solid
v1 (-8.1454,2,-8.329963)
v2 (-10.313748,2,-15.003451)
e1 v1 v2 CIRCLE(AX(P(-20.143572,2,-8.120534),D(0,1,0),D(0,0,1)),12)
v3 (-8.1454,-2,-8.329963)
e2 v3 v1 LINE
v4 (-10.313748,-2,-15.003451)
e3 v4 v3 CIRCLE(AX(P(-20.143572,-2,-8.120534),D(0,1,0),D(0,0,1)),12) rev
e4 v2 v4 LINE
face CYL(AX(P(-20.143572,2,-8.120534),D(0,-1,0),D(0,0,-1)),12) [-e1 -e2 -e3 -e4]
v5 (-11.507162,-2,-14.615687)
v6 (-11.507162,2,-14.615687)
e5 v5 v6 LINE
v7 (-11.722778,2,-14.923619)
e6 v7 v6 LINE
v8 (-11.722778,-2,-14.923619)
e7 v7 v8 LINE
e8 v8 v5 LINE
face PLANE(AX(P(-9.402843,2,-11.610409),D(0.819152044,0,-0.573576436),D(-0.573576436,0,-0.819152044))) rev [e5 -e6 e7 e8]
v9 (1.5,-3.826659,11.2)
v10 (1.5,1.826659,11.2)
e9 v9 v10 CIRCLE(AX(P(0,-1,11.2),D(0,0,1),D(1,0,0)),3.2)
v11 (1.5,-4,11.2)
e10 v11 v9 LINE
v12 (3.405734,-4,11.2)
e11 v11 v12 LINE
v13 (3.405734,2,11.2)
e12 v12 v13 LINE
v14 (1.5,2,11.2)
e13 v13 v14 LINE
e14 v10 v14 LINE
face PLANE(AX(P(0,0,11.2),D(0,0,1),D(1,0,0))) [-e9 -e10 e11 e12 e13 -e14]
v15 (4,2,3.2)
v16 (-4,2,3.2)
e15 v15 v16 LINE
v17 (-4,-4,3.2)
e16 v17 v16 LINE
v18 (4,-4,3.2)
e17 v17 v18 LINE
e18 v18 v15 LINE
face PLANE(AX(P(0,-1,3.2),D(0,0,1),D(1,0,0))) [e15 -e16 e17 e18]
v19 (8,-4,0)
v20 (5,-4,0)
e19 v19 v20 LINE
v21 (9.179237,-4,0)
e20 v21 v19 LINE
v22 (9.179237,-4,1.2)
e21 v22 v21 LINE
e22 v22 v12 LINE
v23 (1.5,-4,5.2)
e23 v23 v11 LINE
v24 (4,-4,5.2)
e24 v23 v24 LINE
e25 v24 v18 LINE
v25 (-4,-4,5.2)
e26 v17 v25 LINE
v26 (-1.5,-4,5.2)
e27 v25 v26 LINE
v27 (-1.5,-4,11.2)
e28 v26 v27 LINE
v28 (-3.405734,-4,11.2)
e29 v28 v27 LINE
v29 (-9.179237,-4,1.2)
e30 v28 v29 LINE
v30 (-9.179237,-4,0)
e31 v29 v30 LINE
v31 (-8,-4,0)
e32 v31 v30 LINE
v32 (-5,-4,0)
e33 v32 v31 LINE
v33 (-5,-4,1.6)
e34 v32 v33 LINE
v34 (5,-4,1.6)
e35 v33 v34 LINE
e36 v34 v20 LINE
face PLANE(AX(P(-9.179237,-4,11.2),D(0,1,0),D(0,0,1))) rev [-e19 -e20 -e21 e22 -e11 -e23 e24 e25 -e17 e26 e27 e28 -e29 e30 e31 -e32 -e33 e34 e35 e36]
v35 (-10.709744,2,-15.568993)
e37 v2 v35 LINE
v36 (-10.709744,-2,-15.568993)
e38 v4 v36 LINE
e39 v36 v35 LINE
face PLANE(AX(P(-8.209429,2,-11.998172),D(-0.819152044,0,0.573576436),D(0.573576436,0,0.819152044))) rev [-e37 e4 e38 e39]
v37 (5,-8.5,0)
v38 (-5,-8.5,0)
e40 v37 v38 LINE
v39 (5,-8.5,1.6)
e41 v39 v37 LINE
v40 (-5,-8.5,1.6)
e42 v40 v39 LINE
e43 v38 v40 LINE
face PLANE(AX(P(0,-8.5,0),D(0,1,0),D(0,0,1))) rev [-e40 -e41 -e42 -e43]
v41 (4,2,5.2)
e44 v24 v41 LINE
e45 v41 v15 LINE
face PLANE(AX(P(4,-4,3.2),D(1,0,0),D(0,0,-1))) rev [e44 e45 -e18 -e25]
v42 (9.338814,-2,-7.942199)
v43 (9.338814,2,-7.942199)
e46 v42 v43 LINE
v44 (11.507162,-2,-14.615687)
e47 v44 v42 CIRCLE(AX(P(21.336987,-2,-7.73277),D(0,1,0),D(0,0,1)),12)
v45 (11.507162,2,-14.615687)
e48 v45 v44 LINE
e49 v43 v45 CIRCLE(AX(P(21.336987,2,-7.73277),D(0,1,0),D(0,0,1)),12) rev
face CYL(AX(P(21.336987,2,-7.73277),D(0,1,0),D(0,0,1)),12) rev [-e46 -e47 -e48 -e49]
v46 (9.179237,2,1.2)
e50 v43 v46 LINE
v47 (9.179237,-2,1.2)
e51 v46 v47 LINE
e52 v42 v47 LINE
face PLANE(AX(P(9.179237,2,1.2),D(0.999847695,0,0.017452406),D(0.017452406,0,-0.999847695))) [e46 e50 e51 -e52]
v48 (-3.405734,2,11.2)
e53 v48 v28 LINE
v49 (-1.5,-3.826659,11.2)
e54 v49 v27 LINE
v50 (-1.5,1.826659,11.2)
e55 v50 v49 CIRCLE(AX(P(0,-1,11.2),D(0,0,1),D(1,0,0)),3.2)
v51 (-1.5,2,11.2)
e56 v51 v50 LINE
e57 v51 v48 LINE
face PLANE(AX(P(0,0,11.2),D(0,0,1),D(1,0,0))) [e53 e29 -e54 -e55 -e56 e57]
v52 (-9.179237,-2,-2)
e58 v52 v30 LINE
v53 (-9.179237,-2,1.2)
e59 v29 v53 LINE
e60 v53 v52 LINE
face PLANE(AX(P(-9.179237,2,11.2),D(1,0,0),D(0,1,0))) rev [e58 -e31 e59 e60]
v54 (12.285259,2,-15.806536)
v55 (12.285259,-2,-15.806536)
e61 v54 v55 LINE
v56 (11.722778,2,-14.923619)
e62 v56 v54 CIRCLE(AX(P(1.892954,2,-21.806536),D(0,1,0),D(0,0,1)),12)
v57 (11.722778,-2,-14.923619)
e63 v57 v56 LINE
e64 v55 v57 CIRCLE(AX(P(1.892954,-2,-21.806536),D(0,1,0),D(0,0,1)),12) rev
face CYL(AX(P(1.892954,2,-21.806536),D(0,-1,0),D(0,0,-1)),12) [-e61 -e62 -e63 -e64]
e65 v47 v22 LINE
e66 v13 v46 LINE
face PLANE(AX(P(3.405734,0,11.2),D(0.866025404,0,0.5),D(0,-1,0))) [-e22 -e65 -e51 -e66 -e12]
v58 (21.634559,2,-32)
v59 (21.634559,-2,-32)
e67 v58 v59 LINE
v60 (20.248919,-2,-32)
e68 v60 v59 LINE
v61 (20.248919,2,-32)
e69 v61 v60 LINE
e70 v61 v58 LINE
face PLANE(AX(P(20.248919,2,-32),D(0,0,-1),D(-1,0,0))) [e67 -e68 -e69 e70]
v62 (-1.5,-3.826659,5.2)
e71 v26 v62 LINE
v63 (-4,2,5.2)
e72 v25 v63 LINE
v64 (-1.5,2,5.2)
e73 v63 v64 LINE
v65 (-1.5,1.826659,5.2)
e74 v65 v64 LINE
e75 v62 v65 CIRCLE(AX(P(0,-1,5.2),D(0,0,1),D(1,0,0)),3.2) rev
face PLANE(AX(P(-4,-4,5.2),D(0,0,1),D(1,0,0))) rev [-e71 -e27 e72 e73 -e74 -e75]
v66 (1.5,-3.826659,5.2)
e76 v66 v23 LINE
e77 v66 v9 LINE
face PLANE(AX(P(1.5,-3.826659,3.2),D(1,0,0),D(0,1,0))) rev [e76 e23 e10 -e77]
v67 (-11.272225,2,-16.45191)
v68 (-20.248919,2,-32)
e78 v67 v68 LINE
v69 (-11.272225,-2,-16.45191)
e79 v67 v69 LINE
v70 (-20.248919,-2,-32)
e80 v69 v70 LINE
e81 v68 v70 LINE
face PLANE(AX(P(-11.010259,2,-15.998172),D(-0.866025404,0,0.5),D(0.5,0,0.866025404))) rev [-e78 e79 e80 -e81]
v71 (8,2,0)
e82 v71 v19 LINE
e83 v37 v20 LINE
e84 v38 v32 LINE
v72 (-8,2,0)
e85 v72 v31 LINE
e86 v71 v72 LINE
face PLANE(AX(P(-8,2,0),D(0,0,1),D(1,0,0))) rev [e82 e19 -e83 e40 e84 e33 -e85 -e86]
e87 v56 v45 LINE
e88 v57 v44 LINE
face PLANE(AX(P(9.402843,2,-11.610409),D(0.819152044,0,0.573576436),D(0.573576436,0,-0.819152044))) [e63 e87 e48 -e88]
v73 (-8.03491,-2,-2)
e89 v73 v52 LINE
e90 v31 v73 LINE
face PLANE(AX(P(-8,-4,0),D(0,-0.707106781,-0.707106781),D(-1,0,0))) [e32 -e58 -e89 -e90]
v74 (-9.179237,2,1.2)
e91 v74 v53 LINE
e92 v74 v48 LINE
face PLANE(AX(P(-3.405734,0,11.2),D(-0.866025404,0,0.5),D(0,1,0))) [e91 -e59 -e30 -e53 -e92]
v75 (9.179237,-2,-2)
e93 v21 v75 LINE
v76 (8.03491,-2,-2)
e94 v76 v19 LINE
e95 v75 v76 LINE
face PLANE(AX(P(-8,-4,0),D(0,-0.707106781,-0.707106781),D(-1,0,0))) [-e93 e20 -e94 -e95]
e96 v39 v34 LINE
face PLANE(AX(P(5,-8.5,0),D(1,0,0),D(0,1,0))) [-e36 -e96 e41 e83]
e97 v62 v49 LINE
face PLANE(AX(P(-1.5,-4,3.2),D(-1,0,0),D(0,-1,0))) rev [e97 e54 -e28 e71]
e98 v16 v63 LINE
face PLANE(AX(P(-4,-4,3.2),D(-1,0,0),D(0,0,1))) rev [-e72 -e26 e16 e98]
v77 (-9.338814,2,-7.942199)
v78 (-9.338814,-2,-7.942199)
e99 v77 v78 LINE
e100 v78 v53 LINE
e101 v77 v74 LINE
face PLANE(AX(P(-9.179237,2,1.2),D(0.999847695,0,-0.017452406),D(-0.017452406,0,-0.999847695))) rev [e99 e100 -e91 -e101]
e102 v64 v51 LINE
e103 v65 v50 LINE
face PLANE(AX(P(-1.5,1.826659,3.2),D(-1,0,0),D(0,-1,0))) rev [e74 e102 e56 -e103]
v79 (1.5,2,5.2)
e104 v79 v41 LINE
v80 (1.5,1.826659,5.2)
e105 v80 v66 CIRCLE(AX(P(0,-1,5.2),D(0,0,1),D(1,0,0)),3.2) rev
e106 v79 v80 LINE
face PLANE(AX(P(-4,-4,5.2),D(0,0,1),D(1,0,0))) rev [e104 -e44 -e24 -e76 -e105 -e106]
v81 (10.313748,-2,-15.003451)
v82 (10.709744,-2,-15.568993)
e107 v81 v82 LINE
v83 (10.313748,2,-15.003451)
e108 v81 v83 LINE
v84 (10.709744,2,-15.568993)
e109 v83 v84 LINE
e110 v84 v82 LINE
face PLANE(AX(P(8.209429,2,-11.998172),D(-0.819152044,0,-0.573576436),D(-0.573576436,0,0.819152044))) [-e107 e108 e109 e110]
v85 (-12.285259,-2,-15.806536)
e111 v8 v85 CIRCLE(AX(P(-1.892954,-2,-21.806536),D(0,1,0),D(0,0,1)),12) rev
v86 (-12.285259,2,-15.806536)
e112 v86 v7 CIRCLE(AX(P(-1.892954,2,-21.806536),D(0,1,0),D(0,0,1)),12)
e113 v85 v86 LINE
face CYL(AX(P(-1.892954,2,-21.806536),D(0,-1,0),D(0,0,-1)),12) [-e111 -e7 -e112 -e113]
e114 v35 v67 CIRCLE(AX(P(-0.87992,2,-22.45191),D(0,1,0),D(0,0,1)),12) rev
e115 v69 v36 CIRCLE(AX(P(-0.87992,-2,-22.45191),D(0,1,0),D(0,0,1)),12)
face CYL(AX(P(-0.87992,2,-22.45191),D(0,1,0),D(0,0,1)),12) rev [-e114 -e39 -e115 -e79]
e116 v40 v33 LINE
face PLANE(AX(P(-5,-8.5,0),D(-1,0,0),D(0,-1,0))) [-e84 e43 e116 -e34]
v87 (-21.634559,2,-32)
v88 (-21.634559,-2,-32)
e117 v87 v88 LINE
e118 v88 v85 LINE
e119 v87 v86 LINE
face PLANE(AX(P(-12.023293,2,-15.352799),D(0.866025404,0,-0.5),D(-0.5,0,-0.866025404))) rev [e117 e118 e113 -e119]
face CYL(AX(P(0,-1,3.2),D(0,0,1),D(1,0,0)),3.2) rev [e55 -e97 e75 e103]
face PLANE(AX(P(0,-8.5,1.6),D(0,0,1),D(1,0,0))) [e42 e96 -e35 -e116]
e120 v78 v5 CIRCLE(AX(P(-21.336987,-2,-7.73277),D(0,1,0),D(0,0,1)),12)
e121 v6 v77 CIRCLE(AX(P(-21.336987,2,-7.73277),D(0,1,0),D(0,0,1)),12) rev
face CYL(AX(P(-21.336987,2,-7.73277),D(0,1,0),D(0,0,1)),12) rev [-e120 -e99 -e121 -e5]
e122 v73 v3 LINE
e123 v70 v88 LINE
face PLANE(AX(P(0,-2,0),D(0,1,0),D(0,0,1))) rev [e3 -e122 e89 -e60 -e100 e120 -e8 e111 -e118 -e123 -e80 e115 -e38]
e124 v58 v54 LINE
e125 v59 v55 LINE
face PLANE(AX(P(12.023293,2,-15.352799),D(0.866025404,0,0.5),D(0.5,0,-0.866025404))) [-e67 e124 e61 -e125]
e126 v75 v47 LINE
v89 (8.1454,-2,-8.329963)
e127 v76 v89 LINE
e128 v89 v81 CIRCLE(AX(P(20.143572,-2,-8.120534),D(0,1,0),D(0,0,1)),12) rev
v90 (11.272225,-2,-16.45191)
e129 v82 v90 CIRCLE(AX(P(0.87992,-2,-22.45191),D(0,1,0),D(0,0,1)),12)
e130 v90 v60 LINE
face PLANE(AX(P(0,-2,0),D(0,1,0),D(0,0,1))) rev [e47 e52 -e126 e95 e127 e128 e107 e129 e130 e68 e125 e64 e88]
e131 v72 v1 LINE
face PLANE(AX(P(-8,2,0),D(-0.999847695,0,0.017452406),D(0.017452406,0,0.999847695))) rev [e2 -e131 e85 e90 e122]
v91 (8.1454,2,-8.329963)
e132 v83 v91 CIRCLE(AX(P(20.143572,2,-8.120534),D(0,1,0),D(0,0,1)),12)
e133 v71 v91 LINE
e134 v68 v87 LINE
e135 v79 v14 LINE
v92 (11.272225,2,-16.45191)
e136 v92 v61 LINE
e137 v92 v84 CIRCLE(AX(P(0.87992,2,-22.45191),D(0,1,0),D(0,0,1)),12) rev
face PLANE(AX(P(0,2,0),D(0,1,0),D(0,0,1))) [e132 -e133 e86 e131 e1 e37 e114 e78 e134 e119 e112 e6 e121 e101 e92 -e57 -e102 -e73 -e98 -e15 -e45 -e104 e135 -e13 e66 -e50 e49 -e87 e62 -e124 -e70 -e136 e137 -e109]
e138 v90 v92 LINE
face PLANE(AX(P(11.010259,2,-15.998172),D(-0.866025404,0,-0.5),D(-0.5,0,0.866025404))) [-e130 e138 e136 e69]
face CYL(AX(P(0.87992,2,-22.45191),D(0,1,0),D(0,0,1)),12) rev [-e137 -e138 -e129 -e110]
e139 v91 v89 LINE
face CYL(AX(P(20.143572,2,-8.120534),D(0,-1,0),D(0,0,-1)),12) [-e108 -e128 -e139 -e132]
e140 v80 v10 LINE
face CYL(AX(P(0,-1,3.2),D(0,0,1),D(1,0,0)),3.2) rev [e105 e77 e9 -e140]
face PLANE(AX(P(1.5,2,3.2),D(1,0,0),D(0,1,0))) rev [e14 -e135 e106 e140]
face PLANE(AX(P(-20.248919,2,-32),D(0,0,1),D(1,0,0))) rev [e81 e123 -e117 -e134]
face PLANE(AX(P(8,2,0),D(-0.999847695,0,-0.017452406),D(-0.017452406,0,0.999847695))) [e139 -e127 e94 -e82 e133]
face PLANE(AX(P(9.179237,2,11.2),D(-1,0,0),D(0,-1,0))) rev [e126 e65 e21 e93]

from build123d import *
from OCP.BRepFilletAPI import BRepFilletAPI_MakeChamfer

# Parameters (mm, degrees)
BOSS_EXTRUDE1_DEPTH             = 2
BOSS_EXTRUDE2_REACH             = 41.677
SKETCH2_W                       = 18.358473432
SKETCH2_H                       = 6
BOSS_EXTRUDE2_DIRECTION_2_DEPTH = 10
CUT_EXTRUDE1_DEPTH              = 8
CUT_EXTRUDE2_DEPTH              = 39.833672901
CUT_EXTRUDE2_DEPTH_BACK         = 39.833672901
SKETCH4_W                       = 8
SKETCH4_H                       = 2
CHAMFER1_SIZE                   = 2
CHAMFER2_SIZE                   = 10
CHAMFER2_SIZE2                  = 5.773502692
FILLET1_START                   = -2
FILLET1_DEPTH                   = 5
FILLET1_2_DEPTH                 = 4
BOSS_EXTRUDE3_START             = -6
SKETCH5_W                       = 10
SKETCH5_H                       = 1.6
BOSS_EXTRUDE3_DEPTH             = 10.5


with BuildPart() as part:
    # Sketch1 → Boss-Extrude1 (new, symmetric)
    with BuildSketch(Plane(origin=(0, 0, 0), x_dir=(1, 0, 0), z_dir=(0, 1, 0))):
        Polygon((-8, 0), (0, 0), (0, -1.2), (-9.179236716, -1.2), (-9.402843228, 11.610408514), (-12.023292949, 15.352798559), (-21.634559182, 32), (-20.248918536, 32), (-11.01025903, 15.998172342), (-8.209428877, 11.998172342), align=None)
    boss_extrude1 = extrude(amount=BOSS_EXTRUDE1_DEPTH, both=True)

    # Mirror1: Boss-Extrude1 across plane
    add(boss_extrude1.mirror(Plane(origin=(0, 2, 0), x_dir=(0, 0, 1), z_dir=(-1, 0, 0))))

    # Boss-Extrude2: up to this face of the body (flat: up to its plane)
    boss_extrude2_end = Plane(part.part.faces().sort_by_distance((0, 0, 0))[0])
    # Sketch2 → Boss-Extrude2 (add, up to the picked face)
    with BuildSketch(Plane.XY.offset(1.2), mode=Mode.PRIVATE) as boss_extrude2_sk1:
        with Locations((0, -1)):
            Rectangle(SKETCH2_W, SKETCH2_H)
    boss_extrude2_tool1 = split(extrude(boss_extrude2_sk1.sketch, amount=-BOSS_EXTRUDE2_REACH, mode=Mode.PRIVATE), bisect_by=boss_extrude2_end, keep=Keep.BOTH, mode=Mode.PRIVATE)
    add(boss_extrude2_tool1.solids().sort_by(Axis((0, -1, 1.2), (0, 0, -1)))[0])

    # Sketch2 → Boss-Extrude2 direction 2 (add)
    with BuildSketch(Plane.XY.offset(1.2)):
        with Locations((0, -1)):
            Rectangle(SKETCH2_W, SKETCH2_H)
    extrude(amount=BOSS_EXTRUDE2_DIRECTION_2_DEPTH)

    # Sketch3 → Cut-Extrude1 (cut)
    with BuildSketch(Plane.XY.offset(11.2)):
        with BuildLine():
            Line((-1.5, 1.826658805), (-1.5, 2))
            Line((-1.5, 2), (1.5, 2))
            Line((1.5, 2), (1.5, 1.826658805))
            ThreePointArc((1.5, 1.826658805), (3.2, -1), (1.5, -3.826658805))
            Line((1.5, -3.826658805), (1.5, -4))
            Line((1.5, -4), (-1.5, -4))
            Line((-1.5, -4), (-1.5, -3.826658805))
            ThreePointArc((-1.5, -3.826658805), (-3.2, -1), (-1.5, 1.826658805))
        make_face()
    extrude(amount=-CUT_EXTRUDE1_DEPTH, mode=Mode.SUBTRACT)

    # Sketch4 → Cut-Extrude2 (cut, two sides: drawn at the far end of the back side and taken through both)
    with BuildSketch(Plane(origin=(0, 0, 0), x_dir=(1, 0, 0), z_dir=(0, 1, 0)).offset(-CUT_EXTRUDE2_DEPTH_BACK)):
        with Locations((0, -4.2)):
            Rectangle(SKETCH4_W, SKETCH4_H)
    extrude(amount=CUT_EXTRUDE2_DEPTH + CUT_EXTRUDE2_DEPTH_BACK, mode=Mode.SUBTRACT)

    # Chamfer1
    chamfer1_edges = [part.edges().sort_by_distance(p)[0] for p in [
        (8.589618358, -2, 0),
        (-8.589618358, -2, 0),
    ]]
    chamfer(chamfer1_edges, length=CHAMFER1_SIZE - 0.0001)  # a hair under: the kernel refuses the full size

    # Chamfer2: one chamfer whose edges measure the first distance from different faces: ONE call of the kernel's chamfer builder (chamfer() names one face for all edges)
    chamfer2_edges_1 = [part.edges().sort_by_distance(p)[0] for p in [
        (9.179236716, -1, 11.2),
    ]]
    chamfer2_side_1 = [part.faces().sort_by_distance(p)[0] for p in [
        (9.179236716, -1.126288177, 5.77807488),
    ]]
    chamfer2_edges_2 = [part.edges().sort_by_distance(p)[0] for p in [
        (-9.179236716, -1, 11.2),
    ]]
    chamfer2_side_2 = [part.faces().sort_by_distance(p)[0] for p in [
        (-9.179236716, -1.126288177, 5.77807488),
    ]]
    chamfer2 = BRepFilletAPI_MakeChamfer(part.part.solid().wrapped)
    for e in chamfer2_edges_1:
        chamfer2.Add(CHAMFER2_SIZE, CHAMFER2_SIZE2, e.wrapped, chamfer2_side_1[0].wrapped)  # the first distance lies on this face
    for e in chamfer2_edges_2:
        chamfer2.Add(CHAMFER2_SIZE, CHAMFER2_SIZE2, e.wrapped, chamfer2_side_2[0].wrapped)  # the first distance lies on this face
    add(Compound.cast(chamfer2.Shape()), mode=Mode.REPLACE)

    # Fillet1: read off the stored shape, not the designer's step
    # Fillet1 outline → Fillet1 (cut)
    with BuildSketch(Plane(origin=(0, 0, 0), x_dir=(1, 0, 0), z_dir=(0, 1, 0)).offset(FILLET1_START)):
        with BuildLine():
            Line((12.023292949, 15.352798559), (12.285258606, 15.806536388))
            ThreePointArc((12.285258606, 15.806536388), (12.013651111, 15.358941087), (11.722778292, 14.923619151))
            Line((11.722778292, 14.923619151), (12.023292949, 15.352798559))
        make_face()
        with BuildLine():
            ThreePointArc((8.145400044, 8.329962936), (8.73089419, 11.828737991), (10.313747854, 15.003451295))
            Line((10.313747854, 15.003451295), (8.209428877, 11.998172342))
            Line((8.209428877, 11.998172342), (8.145400044, 8.329962936))
        make_face()
        with BuildLine():
            Line((-12.023292949, 15.352798559), (-11.722778292, 14.923619151))
            ThreePointArc((-11.722778292, 14.923619151), (-12.013651111, 15.358941087), (-12.285258606, 15.806536388))
            Line((-12.285258606, 15.806536388), (-12.023292949, 15.352798559))
        make_face()
        with BuildLine():
            Line((-8.209428877, 11.998172342), (-10.313747854, 15.003451295))
            ThreePointArc((-10.313747854, 15.003451295), (-8.73089419, 11.828737991), (-8.145400044, 8.329962936))
            Line((-8.145400044, 8.329962936), (-8.209428877, 11.998172342))
        make_face()
    extrude(amount=FILLET1_DEPTH, mode=Mode.SUBTRACT)

    # Fillet1 2 outline → Fillet1 2 (add)
    with BuildSketch(Plane(origin=(0, 0, 0), x_dir=(1, 0, 0), z_dir=(0, 1, 0)).offset(FILLET1_START)):
        with BuildLine():
            ThreePointArc((9.338814395, 7.942199107), (9.924308541, 11.440974162), (11.507162205, 14.615687466))
            Line((11.507162205, 14.615687466), (9.402843228, 11.610408514))
            Line((9.402843228, 11.610408514), (9.338814395, 7.942199107))
        make_face()
        with BuildLine():
            ThreePointArc((11.272224688, 16.45191017), (11.000617192, 16.00431487), (10.709744374, 15.568992934))
            Line((10.709744374, 15.568992934), (11.01025903, 15.998172342))
            Line((11.01025903, 15.998172342), (11.272224688, 16.45191017))
        make_face()
        with BuildLine():
            Line((-9.402843228, 11.610408514), (-11.507162205, 14.615687466))
            ThreePointArc((-11.507162205, 14.615687466), (-9.924308541, 11.440974162), (-9.338814395, 7.942199107))
            Line((-9.338814395, 7.942199107), (-9.402843228, 11.610408514))
        make_face()
        with BuildLine():
            ThreePointArc((-10.709744374, 15.568992934), (-11.000617192, 16.00431487), (-11.272224688, 16.45191017))
            Line((-11.272224688, 16.45191017), (-11.01025903, 15.998172342))
            Line((-11.01025903, 15.998172342), (-10.709744374, 15.568992934))
        make_face()
    extrude(amount=FILLET1_2_DEPTH)

    # Sketch5 → Boss-Extrude3 (add)
    with BuildSketch(Plane.XZ.offset(4).offset(BOSS_EXTRUDE3_START)):
        with Locations((0, 0.8)):
            Rectangle(SKETCH5_W, SKETCH5_H)
    extrude(amount=BOSS_EXTRUDE3_DEPTH)


solid = part.part
